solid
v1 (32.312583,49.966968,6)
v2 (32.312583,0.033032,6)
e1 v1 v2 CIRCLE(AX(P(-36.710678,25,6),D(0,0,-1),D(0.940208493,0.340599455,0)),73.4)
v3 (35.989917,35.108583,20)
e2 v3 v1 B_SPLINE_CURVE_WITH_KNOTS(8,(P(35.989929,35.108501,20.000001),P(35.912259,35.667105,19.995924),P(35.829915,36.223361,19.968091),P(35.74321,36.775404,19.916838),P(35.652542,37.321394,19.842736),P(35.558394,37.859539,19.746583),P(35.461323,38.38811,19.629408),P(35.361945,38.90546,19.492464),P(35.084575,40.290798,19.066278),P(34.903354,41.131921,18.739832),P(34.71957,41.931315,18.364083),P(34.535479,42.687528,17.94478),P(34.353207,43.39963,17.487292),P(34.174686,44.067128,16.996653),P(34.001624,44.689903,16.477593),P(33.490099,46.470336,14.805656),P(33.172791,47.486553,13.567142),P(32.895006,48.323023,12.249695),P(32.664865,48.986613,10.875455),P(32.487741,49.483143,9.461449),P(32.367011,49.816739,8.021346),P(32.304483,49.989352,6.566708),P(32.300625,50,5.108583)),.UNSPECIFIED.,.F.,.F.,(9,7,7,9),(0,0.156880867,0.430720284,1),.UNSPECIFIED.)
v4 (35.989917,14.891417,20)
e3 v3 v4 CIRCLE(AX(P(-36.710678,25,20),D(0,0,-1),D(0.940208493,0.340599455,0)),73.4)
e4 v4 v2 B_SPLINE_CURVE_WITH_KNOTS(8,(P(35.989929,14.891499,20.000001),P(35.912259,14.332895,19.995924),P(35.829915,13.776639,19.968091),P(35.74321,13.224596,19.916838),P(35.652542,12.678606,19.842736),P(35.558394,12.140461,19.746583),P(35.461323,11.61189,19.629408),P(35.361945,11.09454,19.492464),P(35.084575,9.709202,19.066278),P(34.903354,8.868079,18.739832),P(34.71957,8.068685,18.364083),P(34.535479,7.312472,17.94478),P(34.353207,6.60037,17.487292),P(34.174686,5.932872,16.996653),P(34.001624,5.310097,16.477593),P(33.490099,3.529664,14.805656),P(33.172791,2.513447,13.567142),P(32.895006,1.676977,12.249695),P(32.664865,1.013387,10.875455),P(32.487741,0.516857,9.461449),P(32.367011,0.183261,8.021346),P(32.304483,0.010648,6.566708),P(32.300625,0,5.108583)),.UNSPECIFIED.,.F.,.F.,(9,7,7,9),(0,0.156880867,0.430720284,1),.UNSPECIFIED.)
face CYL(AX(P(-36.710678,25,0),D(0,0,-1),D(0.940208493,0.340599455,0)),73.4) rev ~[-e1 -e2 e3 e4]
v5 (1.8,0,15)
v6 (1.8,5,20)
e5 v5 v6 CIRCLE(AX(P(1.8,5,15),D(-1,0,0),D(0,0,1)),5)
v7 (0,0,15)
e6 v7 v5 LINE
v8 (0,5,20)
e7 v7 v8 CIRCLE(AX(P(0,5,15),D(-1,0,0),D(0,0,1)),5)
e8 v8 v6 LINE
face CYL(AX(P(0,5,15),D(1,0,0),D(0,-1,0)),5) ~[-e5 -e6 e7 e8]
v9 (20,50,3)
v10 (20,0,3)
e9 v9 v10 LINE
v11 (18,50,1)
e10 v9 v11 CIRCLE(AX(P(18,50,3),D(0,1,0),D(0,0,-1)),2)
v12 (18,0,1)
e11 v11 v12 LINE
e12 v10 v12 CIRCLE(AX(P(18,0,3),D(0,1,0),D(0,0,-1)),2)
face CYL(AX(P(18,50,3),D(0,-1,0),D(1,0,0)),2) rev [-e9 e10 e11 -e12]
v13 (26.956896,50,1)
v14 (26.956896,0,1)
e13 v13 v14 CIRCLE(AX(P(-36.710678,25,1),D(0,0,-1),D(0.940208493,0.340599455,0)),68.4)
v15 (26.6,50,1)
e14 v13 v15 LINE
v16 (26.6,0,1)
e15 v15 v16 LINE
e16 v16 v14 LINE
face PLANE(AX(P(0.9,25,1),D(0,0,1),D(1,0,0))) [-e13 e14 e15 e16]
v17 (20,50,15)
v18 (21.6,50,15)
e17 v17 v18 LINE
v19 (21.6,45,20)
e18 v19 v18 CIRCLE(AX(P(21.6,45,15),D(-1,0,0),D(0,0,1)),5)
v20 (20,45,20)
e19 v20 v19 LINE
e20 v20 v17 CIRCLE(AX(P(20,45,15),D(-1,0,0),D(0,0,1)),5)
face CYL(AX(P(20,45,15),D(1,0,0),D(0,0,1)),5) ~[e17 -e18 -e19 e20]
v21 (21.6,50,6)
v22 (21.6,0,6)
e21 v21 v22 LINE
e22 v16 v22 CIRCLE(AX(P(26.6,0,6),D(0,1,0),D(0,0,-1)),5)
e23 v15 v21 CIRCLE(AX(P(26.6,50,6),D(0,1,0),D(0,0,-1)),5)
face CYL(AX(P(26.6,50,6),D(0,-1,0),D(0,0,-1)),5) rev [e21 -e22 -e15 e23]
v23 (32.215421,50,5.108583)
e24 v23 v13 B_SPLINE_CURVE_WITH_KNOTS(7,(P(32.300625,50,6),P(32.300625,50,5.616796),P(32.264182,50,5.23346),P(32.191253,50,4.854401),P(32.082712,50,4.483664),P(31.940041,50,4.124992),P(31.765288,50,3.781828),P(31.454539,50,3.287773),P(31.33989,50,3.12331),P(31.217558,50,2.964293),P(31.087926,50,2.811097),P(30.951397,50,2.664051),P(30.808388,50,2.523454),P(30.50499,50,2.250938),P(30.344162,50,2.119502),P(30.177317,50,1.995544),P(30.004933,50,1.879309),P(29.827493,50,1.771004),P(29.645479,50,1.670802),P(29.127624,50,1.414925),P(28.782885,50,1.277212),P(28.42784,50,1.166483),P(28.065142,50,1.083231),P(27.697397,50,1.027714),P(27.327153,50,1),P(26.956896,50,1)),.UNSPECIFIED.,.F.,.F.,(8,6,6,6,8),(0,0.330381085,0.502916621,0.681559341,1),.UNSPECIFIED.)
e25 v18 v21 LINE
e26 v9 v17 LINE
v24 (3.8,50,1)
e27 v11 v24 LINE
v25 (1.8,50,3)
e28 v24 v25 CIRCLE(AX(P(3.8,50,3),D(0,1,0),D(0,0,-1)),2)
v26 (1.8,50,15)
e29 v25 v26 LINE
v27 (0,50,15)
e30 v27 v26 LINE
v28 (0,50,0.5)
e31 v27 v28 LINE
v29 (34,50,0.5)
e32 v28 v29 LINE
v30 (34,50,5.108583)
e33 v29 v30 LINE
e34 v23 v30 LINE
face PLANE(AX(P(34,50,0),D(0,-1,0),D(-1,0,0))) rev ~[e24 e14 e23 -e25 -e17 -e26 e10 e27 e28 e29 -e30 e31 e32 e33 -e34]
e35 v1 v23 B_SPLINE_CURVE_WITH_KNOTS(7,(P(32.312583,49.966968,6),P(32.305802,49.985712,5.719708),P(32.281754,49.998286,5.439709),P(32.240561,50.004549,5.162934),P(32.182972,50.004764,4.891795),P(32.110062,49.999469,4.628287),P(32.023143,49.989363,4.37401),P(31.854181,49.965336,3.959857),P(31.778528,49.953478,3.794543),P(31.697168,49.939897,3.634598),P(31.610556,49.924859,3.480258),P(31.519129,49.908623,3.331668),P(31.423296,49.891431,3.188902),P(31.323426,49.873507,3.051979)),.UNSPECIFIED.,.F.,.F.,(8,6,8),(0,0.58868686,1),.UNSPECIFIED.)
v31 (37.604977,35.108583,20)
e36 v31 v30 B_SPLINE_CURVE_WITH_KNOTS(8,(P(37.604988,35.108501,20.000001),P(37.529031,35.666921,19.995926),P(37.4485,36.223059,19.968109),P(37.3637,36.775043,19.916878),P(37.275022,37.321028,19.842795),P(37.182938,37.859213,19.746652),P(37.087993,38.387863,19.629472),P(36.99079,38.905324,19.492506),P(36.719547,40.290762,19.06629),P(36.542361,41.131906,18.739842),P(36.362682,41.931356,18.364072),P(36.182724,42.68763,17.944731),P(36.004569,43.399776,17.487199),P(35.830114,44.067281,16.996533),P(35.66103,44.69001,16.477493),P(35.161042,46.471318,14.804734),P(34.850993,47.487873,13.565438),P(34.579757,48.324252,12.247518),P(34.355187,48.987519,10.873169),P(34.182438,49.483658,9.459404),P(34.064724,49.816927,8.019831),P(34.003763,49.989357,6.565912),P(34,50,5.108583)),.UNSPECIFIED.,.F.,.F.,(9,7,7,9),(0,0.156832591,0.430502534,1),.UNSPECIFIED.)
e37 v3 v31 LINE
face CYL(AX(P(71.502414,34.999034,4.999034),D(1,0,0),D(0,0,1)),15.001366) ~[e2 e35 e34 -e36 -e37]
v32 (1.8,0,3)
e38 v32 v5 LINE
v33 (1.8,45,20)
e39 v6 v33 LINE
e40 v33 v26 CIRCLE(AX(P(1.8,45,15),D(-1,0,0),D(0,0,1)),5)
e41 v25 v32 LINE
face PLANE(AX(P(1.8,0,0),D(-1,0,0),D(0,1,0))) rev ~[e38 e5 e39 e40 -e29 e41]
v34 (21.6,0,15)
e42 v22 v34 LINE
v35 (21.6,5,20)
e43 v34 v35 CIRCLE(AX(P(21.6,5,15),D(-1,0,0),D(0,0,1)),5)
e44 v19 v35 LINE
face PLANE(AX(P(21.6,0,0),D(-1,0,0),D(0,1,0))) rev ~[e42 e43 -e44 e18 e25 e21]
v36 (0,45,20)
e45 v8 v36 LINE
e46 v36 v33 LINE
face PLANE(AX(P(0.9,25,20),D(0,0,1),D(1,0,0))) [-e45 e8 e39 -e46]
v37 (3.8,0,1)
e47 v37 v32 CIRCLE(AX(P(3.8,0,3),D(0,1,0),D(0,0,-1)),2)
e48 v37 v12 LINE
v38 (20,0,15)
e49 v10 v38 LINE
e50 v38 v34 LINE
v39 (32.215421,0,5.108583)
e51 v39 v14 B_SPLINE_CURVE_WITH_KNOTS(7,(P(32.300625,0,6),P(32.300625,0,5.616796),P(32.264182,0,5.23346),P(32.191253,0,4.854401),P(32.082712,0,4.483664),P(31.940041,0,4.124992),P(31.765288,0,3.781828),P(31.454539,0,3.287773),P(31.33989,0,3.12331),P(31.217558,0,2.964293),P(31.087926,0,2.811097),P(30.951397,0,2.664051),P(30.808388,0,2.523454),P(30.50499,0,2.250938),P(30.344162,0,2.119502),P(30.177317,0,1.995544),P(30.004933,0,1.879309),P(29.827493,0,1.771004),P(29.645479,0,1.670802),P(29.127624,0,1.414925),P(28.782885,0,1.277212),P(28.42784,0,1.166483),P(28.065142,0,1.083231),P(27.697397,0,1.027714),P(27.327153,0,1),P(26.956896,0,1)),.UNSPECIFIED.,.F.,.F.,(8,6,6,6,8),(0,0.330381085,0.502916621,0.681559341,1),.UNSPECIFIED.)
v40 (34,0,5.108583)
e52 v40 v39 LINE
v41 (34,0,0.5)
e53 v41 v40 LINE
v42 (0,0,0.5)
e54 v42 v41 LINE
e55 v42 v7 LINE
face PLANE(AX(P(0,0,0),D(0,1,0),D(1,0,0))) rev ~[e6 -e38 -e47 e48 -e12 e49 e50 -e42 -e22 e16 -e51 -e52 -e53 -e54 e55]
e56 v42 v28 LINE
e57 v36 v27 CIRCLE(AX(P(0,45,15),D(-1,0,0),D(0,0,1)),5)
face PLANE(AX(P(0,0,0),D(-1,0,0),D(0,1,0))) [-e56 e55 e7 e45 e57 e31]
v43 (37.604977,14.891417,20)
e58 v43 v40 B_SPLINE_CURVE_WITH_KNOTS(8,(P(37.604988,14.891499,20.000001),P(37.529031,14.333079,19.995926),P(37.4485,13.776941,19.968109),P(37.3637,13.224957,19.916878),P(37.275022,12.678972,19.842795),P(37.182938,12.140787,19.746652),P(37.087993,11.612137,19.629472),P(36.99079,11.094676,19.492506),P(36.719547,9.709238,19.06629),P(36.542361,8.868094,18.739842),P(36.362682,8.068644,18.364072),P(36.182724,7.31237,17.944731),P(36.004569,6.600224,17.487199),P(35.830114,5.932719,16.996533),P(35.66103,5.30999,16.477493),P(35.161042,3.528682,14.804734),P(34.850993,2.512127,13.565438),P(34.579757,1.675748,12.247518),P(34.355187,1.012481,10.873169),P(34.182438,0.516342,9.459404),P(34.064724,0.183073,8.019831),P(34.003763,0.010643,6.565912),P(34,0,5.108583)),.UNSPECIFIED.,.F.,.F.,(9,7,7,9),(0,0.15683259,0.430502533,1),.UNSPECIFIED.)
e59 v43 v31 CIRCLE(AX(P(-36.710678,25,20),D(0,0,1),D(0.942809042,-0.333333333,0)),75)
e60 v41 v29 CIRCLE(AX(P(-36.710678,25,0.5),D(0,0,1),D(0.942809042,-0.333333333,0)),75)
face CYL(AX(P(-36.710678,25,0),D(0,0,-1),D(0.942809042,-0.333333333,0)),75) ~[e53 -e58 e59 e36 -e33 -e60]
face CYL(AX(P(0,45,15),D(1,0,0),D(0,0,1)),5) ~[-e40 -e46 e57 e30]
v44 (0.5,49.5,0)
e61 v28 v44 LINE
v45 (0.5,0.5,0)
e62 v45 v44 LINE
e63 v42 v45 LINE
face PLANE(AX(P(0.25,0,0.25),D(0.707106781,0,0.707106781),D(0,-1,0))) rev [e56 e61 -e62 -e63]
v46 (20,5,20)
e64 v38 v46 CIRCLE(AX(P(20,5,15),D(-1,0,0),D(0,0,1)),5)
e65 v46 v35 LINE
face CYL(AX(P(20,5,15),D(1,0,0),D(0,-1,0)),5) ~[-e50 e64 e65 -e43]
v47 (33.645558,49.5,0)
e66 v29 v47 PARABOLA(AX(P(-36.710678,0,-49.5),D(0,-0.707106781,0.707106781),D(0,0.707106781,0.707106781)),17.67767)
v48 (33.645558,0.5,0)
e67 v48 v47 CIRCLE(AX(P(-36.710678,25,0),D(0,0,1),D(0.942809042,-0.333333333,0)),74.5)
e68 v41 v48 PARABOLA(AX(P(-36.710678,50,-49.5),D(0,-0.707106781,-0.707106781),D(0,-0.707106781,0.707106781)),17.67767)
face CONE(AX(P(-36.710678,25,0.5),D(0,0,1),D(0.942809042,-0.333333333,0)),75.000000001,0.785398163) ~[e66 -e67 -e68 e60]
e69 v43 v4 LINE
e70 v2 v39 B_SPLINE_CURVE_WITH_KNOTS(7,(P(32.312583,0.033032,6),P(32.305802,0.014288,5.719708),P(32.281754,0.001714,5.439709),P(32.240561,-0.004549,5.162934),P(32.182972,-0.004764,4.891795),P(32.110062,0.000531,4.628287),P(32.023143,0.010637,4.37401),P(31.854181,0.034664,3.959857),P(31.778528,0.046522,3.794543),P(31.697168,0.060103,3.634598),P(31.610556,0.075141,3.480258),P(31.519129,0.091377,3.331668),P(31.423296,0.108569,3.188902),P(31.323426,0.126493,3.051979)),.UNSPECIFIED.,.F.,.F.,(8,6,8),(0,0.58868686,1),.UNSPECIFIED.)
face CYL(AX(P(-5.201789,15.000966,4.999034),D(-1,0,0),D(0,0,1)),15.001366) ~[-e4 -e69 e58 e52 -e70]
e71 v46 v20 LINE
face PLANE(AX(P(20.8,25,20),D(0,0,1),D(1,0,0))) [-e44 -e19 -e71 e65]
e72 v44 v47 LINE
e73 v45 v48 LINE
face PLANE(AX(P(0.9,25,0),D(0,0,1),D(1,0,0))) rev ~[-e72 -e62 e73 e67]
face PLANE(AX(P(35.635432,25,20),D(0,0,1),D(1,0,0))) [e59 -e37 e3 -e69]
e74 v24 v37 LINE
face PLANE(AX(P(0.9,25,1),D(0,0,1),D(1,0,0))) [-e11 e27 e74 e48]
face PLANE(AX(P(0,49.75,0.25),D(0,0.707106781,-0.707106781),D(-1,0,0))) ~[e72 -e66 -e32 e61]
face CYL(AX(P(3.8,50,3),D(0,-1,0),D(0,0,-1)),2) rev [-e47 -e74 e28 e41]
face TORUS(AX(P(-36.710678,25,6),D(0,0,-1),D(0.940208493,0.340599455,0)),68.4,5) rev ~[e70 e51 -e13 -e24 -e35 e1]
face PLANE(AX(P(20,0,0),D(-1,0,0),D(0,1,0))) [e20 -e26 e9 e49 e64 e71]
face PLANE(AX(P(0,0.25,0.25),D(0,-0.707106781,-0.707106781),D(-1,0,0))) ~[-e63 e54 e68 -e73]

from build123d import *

# Parameters (mm, degrees)
F0_W         = 1.8
F0_H         = 50
F0_W_2       = 18.2
F0_W_3       = 1.6
F1_DEPTH     = 1
F2_DEPTH     = 20
F3_DEPTH     = 20
F4_T4_DEPTH  = 76.7042031505
F4_T9_DEPTH  = 76.6048284538
F4_T14_DEPTH = 76.8048284538
F4_T19_DEPTH = 76.7042031505
F4_T24_DEPTH = 76.6048284538
F4_T29_DEPTH = 76.8048284538
F5_R         = 5
F6_R         = 2
F7_R         = 5
F8_SIZE      = 0.5


# Not quite as in the source:
# - a fillet or chamfer that OpenCascade refuses, or shapes differently, is made with other operations: its cross-section is extruded or revolved along the edge and cut away or added


with BuildPart() as f1:
    # F0 (on Top) → F1 (new body)
    with BuildSketch(Plane.XY):
        with Locations((0.9, 25)):
            Rectangle(F0_W, F0_H)
        with Locations((10.9, 25)):
            Rectangle(F0_W_2, F0_H)
        with Locations((20.8, 25)):
            Rectangle(F0_W_3, F0_H)
        with BuildLine():
            Line((21.6, 50), (21.6, 0))
            Line((21.6, 0), (32.3006253033, 0))
            ThreePointArc((32.3006253033, 0), (36.6893218813, 25), (32.3006253033, 50))
            Line((32.3006253033, 50), (21.6, 50))
        make_face()
        with BuildLine():
            ThreePointArc((32.3006253033, 50), (36.6893218813, 25), (32.3006253033, 0))
            Line((32.3006253033, 0), (34, 0))
            ThreePointArc((34, 0), (38.2893218813, 25), (34, 50))
            Line((34, 50), (32.3006253033, 50))
        make_face()
    extrude(amount=F1_DEPTH)

    # F0 (on Top) → F2 (join)
    with BuildSketch(Plane.XY):
        with Locations((0.9, 25)):
            Rectangle(F0_W, F0_H)
        with Locations((20.8, 25)):
            Rectangle(F0_W_3, F0_H)
    extrude(amount=F2_DEPTH)

    # F0 (on Top) → F3 (join)
    with BuildSketch(Plane.XY):
        with BuildLine():
            ThreePointArc((32.3006253033, 50), (36.6893218813, 25), (32.3006253033, 0))
            Line((32.3006253033, 0), (34, 0))
            ThreePointArc((34, 0), (38.2893218813, 25), (34, 50))
            Line((34, 50), (32.3006253033, 50))
        make_face()
    extrude(amount=F3_DEPTH)

    # F4: fillet of radius 15 on 6 edges, made by hand


with BuildPart() as f4_tool2:
    # F4_s3 → F4_t4 (new body)
    with BuildSketch(Plane.YZ.offset(-5.2017889236)):
        with BuildLine():
            ThreePointArc((15.0009656854, 20.0004), (4.3933982822, 15.6066017178), (-0.0004, 4.9990343146))
            Line((-0.0004, 4.9990343146), (-1.5005365685, 4.9990343146))
            ThreePointArc((-1.5005365685, 4.9990343146), (-1.5001365685, 12.4995171573), (-1.5001365685, 20))
            Line((-1.5001365685, 20), (0, 21.5001365685))
            ThreePointArc((0, 21.5001365685), (7.5004828427, 21.5001365685), (15.0009656854, 21.5005365685))
            Line((15.0009656854, 21.5005365685), (15.0009656854, 20.0004))
        make_face()
    extrude(amount=F4_T4_DEPTH)

    split(bisect_by=Plane.YZ.offset(21.6), keep=Keep.TOP)


with BuildPart() as f1_1:
    add(f1.part)

    # F4_t1: cut F4_tool2
    add(f4_tool2.part, mode=Mode.SUBTRACT)


with BuildPart() as f4_tool7:
    # F4_s8 → F4_t9 (new body)
    with BuildSketch(Plane.YZ.offset(-17.5024142269)):
        with BuildLine():
            ThreePointArc((15.0009656854, 20.0004), (4.3933982822, 15.6066017178), (-0.0004, 4.9990343146))
            Line((-0.0004, 4.9990343146), (-1.5005365685, 4.9990343146))
            ThreePointArc((-1.5005365685, 4.9990343146), (-1.5001365685, 12.4995171573), (-1.5001365685, 20))
            Line((-1.5001365685, 20), (0, 21.5001365685))
            ThreePointArc((0, 21.5001365685), (7.5004828427, 21.5001365685), (15.0009656854, 21.5005365685))
            Line((15.0009656854, 21.5005365685), (15.0009656854, 20.0004))
        make_face()
    extrude(amount=F4_T9_DEPTH)

    split(bisect_by=Plane.YZ.offset(21.6), keep=Keep.TOP)


with BuildPart() as f1_2:
    add(f1_1.part)

    # F4_t6: cut F4_tool7
    add(f4_tool7.part, mode=Mode.SUBTRACT)


with BuildPart() as f4_tool12:
    # F4_s13 → F4_t14 (new body)
    with BuildSketch(Plane.YZ.offset(-37.5024142269)):
        with BuildLine():
            ThreePointArc((-0.0004, 4.9990343146), (4.3933982822, 15.6066017178), (15.0009656854, 20.0004))
            Line((15.0009656854, 20.0004), (15.0009656854, 21.5005365685))
            ThreePointArc((15.0009656854, 21.5005365685), (7.5004828427, 21.5001365685), (0, 21.5001365685))
            Line((0, 21.5001365685), (-1.5001365685, 20))
            ThreePointArc((-1.5001365685, 20), (-1.5001365685, 12.4995171573), (-1.5005365685, 4.9990343146))
            Line((-1.5005365685, 4.9990343146), (-0.0004, 4.9990343146))
        make_face()
    extrude(amount=F4_T14_DEPTH)

    split(bisect_by=Plane.YZ.offset(21.6), keep=Keep.TOP)


with BuildPart() as f1_3:
    add(f1_2.part)

    # F4_t11: cut F4_tool12
    add(f4_tool12.part, mode=Mode.SUBTRACT)


with BuildPart() as f4_tool17:
    # F4_s18 → F4_t19 (new body)
    with BuildSketch(Plane.YZ.offset(71.5024142269)):
        with BuildLine():
            ThreePointArc((34.9990343146, 20.0004), (45.6066017178, 15.6066017178), (50.0004, 4.9990343146))
            Line((50.0004, 4.9990343146), (51.5005365685, 4.9990343146))
            ThreePointArc((51.5005365685, 4.9990343146), (51.5001365685, 12.4995171573), (51.5001365685, 20))
            Line((51.5001365685, 20), (50, 21.5001365685))
            ThreePointArc((50, 21.5001365685), (42.4995171573, 21.5001365685), (34.9990343146, 21.5005365685))
            Line((34.9990343146, 21.5005365685), (34.9990343146, 20.0004))
        make_face()
    extrude(amount=-F4_T19_DEPTH)

    split(bisect_by=Plane.YZ.offset(21.6), keep=Keep.TOP)


with BuildPart() as f1_4:
    add(f1_3.part)

    # F4_t16: cut F4_tool17
    add(f4_tool17.part, mode=Mode.SUBTRACT)


with BuildPart() as f4_tool22:
    # F4_s23 → F4_t24 (new body)
    with BuildSketch(Plane.YZ.offset(59.1024142269)):
        with BuildLine():
            ThreePointArc((34.9990343146, 20.0004), (45.6066017178, 15.6066017178), (50.0004, 4.9990343146))
            Line((50.0004, 4.9990343146), (51.5005365685, 4.9990343146))
            ThreePointArc((51.5005365685, 4.9990343146), (51.5001365685, 12.4995171573), (51.5001365685, 20))
            Line((51.5001365685, 20), (50, 21.5001365685))
            ThreePointArc((50, 21.5001365685), (42.4995171573, 21.5001365685), (34.9990343146, 21.5005365685))
            Line((34.9990343146, 21.5005365685), (34.9990343146, 20.0004))
        make_face()
    extrude(amount=-F4_T24_DEPTH)

    split(bisect_by=Plane.YZ.offset(21.6), keep=Keep.TOP)


with BuildPart() as f1_5:
    add(f1_4.part)

    # F4_t21: cut F4_tool22
    add(f4_tool22.part, mode=Mode.SUBTRACT)


with BuildPart() as f4_tool27:
    # F4_s28 → F4_t29 (new body)
    with BuildSketch(Plane.YZ.offset(39.3024142269)):
        with BuildLine():
            ThreePointArc((34.9990343146, 20.0004), (45.6066017178, 15.6066017178), (50.0004, 4.9990343146))
            Line((50.0004, 4.9990343146), (51.5005365685, 4.9990343146))
            ThreePointArc((51.5005365685, 4.9990343146), (51.5001365685, 12.4995171573), (51.5001365685, 20))
            Line((51.5001365685, 20), (50, 21.5001365685))
            ThreePointArc((50, 21.5001365685), (42.4995171573, 21.5001365685), (34.9990343146, 21.5005365685))
            Line((34.9990343146, 21.5005365685), (34.9990343146, 20.0004))
        make_face()
    extrude(amount=-F4_T29_DEPTH)

    split(bisect_by=Plane.YZ.offset(21.6), keep=Keep.TOP)


with BuildPart() as f1_6:
    add(f1_5.part)

    # F4_t26: cut F4_tool27
    add(f4_tool27.part, mode=Mode.SUBTRACT)

    # F5
    f5_edges = [f1_6.edges().sort_by_distance(p)[0] for p in [
        (36.689322, 25, 1),
        (21.6, 25, 1),
    ]]
    fillet(f5_edges, radius=F5_R)

    # F6
    f6_edges = [f1_6.edges().sort_by_distance(p)[0] for p in [
        (1.8, 25, 1),
        (20, 25, 1),
    ]]
    fillet(f6_edges, radius=F6_R)

    # F7
    f7_edges = [f1_6.edges().sort_by_distance(p)[0] for p in [
        (0.9, 0, 20),
        (20.8, 0, 20),
        (20.8, 50, 20),
        (0.9, 50, 20),
    ]]
    fillet(f7_edges, radius=F7_R)

    # F8
    f8_edges = [f1_6.edges().sort_by_distance(p)[0] for p in [
        (0, 25, 0),
        (17, 0, 0),
        (38.289322, 25, 0),
        (17, 50, 0),
    ]]
    chamfer(f8_edges, length=F8_SIZE)


solid = f1_6.part
